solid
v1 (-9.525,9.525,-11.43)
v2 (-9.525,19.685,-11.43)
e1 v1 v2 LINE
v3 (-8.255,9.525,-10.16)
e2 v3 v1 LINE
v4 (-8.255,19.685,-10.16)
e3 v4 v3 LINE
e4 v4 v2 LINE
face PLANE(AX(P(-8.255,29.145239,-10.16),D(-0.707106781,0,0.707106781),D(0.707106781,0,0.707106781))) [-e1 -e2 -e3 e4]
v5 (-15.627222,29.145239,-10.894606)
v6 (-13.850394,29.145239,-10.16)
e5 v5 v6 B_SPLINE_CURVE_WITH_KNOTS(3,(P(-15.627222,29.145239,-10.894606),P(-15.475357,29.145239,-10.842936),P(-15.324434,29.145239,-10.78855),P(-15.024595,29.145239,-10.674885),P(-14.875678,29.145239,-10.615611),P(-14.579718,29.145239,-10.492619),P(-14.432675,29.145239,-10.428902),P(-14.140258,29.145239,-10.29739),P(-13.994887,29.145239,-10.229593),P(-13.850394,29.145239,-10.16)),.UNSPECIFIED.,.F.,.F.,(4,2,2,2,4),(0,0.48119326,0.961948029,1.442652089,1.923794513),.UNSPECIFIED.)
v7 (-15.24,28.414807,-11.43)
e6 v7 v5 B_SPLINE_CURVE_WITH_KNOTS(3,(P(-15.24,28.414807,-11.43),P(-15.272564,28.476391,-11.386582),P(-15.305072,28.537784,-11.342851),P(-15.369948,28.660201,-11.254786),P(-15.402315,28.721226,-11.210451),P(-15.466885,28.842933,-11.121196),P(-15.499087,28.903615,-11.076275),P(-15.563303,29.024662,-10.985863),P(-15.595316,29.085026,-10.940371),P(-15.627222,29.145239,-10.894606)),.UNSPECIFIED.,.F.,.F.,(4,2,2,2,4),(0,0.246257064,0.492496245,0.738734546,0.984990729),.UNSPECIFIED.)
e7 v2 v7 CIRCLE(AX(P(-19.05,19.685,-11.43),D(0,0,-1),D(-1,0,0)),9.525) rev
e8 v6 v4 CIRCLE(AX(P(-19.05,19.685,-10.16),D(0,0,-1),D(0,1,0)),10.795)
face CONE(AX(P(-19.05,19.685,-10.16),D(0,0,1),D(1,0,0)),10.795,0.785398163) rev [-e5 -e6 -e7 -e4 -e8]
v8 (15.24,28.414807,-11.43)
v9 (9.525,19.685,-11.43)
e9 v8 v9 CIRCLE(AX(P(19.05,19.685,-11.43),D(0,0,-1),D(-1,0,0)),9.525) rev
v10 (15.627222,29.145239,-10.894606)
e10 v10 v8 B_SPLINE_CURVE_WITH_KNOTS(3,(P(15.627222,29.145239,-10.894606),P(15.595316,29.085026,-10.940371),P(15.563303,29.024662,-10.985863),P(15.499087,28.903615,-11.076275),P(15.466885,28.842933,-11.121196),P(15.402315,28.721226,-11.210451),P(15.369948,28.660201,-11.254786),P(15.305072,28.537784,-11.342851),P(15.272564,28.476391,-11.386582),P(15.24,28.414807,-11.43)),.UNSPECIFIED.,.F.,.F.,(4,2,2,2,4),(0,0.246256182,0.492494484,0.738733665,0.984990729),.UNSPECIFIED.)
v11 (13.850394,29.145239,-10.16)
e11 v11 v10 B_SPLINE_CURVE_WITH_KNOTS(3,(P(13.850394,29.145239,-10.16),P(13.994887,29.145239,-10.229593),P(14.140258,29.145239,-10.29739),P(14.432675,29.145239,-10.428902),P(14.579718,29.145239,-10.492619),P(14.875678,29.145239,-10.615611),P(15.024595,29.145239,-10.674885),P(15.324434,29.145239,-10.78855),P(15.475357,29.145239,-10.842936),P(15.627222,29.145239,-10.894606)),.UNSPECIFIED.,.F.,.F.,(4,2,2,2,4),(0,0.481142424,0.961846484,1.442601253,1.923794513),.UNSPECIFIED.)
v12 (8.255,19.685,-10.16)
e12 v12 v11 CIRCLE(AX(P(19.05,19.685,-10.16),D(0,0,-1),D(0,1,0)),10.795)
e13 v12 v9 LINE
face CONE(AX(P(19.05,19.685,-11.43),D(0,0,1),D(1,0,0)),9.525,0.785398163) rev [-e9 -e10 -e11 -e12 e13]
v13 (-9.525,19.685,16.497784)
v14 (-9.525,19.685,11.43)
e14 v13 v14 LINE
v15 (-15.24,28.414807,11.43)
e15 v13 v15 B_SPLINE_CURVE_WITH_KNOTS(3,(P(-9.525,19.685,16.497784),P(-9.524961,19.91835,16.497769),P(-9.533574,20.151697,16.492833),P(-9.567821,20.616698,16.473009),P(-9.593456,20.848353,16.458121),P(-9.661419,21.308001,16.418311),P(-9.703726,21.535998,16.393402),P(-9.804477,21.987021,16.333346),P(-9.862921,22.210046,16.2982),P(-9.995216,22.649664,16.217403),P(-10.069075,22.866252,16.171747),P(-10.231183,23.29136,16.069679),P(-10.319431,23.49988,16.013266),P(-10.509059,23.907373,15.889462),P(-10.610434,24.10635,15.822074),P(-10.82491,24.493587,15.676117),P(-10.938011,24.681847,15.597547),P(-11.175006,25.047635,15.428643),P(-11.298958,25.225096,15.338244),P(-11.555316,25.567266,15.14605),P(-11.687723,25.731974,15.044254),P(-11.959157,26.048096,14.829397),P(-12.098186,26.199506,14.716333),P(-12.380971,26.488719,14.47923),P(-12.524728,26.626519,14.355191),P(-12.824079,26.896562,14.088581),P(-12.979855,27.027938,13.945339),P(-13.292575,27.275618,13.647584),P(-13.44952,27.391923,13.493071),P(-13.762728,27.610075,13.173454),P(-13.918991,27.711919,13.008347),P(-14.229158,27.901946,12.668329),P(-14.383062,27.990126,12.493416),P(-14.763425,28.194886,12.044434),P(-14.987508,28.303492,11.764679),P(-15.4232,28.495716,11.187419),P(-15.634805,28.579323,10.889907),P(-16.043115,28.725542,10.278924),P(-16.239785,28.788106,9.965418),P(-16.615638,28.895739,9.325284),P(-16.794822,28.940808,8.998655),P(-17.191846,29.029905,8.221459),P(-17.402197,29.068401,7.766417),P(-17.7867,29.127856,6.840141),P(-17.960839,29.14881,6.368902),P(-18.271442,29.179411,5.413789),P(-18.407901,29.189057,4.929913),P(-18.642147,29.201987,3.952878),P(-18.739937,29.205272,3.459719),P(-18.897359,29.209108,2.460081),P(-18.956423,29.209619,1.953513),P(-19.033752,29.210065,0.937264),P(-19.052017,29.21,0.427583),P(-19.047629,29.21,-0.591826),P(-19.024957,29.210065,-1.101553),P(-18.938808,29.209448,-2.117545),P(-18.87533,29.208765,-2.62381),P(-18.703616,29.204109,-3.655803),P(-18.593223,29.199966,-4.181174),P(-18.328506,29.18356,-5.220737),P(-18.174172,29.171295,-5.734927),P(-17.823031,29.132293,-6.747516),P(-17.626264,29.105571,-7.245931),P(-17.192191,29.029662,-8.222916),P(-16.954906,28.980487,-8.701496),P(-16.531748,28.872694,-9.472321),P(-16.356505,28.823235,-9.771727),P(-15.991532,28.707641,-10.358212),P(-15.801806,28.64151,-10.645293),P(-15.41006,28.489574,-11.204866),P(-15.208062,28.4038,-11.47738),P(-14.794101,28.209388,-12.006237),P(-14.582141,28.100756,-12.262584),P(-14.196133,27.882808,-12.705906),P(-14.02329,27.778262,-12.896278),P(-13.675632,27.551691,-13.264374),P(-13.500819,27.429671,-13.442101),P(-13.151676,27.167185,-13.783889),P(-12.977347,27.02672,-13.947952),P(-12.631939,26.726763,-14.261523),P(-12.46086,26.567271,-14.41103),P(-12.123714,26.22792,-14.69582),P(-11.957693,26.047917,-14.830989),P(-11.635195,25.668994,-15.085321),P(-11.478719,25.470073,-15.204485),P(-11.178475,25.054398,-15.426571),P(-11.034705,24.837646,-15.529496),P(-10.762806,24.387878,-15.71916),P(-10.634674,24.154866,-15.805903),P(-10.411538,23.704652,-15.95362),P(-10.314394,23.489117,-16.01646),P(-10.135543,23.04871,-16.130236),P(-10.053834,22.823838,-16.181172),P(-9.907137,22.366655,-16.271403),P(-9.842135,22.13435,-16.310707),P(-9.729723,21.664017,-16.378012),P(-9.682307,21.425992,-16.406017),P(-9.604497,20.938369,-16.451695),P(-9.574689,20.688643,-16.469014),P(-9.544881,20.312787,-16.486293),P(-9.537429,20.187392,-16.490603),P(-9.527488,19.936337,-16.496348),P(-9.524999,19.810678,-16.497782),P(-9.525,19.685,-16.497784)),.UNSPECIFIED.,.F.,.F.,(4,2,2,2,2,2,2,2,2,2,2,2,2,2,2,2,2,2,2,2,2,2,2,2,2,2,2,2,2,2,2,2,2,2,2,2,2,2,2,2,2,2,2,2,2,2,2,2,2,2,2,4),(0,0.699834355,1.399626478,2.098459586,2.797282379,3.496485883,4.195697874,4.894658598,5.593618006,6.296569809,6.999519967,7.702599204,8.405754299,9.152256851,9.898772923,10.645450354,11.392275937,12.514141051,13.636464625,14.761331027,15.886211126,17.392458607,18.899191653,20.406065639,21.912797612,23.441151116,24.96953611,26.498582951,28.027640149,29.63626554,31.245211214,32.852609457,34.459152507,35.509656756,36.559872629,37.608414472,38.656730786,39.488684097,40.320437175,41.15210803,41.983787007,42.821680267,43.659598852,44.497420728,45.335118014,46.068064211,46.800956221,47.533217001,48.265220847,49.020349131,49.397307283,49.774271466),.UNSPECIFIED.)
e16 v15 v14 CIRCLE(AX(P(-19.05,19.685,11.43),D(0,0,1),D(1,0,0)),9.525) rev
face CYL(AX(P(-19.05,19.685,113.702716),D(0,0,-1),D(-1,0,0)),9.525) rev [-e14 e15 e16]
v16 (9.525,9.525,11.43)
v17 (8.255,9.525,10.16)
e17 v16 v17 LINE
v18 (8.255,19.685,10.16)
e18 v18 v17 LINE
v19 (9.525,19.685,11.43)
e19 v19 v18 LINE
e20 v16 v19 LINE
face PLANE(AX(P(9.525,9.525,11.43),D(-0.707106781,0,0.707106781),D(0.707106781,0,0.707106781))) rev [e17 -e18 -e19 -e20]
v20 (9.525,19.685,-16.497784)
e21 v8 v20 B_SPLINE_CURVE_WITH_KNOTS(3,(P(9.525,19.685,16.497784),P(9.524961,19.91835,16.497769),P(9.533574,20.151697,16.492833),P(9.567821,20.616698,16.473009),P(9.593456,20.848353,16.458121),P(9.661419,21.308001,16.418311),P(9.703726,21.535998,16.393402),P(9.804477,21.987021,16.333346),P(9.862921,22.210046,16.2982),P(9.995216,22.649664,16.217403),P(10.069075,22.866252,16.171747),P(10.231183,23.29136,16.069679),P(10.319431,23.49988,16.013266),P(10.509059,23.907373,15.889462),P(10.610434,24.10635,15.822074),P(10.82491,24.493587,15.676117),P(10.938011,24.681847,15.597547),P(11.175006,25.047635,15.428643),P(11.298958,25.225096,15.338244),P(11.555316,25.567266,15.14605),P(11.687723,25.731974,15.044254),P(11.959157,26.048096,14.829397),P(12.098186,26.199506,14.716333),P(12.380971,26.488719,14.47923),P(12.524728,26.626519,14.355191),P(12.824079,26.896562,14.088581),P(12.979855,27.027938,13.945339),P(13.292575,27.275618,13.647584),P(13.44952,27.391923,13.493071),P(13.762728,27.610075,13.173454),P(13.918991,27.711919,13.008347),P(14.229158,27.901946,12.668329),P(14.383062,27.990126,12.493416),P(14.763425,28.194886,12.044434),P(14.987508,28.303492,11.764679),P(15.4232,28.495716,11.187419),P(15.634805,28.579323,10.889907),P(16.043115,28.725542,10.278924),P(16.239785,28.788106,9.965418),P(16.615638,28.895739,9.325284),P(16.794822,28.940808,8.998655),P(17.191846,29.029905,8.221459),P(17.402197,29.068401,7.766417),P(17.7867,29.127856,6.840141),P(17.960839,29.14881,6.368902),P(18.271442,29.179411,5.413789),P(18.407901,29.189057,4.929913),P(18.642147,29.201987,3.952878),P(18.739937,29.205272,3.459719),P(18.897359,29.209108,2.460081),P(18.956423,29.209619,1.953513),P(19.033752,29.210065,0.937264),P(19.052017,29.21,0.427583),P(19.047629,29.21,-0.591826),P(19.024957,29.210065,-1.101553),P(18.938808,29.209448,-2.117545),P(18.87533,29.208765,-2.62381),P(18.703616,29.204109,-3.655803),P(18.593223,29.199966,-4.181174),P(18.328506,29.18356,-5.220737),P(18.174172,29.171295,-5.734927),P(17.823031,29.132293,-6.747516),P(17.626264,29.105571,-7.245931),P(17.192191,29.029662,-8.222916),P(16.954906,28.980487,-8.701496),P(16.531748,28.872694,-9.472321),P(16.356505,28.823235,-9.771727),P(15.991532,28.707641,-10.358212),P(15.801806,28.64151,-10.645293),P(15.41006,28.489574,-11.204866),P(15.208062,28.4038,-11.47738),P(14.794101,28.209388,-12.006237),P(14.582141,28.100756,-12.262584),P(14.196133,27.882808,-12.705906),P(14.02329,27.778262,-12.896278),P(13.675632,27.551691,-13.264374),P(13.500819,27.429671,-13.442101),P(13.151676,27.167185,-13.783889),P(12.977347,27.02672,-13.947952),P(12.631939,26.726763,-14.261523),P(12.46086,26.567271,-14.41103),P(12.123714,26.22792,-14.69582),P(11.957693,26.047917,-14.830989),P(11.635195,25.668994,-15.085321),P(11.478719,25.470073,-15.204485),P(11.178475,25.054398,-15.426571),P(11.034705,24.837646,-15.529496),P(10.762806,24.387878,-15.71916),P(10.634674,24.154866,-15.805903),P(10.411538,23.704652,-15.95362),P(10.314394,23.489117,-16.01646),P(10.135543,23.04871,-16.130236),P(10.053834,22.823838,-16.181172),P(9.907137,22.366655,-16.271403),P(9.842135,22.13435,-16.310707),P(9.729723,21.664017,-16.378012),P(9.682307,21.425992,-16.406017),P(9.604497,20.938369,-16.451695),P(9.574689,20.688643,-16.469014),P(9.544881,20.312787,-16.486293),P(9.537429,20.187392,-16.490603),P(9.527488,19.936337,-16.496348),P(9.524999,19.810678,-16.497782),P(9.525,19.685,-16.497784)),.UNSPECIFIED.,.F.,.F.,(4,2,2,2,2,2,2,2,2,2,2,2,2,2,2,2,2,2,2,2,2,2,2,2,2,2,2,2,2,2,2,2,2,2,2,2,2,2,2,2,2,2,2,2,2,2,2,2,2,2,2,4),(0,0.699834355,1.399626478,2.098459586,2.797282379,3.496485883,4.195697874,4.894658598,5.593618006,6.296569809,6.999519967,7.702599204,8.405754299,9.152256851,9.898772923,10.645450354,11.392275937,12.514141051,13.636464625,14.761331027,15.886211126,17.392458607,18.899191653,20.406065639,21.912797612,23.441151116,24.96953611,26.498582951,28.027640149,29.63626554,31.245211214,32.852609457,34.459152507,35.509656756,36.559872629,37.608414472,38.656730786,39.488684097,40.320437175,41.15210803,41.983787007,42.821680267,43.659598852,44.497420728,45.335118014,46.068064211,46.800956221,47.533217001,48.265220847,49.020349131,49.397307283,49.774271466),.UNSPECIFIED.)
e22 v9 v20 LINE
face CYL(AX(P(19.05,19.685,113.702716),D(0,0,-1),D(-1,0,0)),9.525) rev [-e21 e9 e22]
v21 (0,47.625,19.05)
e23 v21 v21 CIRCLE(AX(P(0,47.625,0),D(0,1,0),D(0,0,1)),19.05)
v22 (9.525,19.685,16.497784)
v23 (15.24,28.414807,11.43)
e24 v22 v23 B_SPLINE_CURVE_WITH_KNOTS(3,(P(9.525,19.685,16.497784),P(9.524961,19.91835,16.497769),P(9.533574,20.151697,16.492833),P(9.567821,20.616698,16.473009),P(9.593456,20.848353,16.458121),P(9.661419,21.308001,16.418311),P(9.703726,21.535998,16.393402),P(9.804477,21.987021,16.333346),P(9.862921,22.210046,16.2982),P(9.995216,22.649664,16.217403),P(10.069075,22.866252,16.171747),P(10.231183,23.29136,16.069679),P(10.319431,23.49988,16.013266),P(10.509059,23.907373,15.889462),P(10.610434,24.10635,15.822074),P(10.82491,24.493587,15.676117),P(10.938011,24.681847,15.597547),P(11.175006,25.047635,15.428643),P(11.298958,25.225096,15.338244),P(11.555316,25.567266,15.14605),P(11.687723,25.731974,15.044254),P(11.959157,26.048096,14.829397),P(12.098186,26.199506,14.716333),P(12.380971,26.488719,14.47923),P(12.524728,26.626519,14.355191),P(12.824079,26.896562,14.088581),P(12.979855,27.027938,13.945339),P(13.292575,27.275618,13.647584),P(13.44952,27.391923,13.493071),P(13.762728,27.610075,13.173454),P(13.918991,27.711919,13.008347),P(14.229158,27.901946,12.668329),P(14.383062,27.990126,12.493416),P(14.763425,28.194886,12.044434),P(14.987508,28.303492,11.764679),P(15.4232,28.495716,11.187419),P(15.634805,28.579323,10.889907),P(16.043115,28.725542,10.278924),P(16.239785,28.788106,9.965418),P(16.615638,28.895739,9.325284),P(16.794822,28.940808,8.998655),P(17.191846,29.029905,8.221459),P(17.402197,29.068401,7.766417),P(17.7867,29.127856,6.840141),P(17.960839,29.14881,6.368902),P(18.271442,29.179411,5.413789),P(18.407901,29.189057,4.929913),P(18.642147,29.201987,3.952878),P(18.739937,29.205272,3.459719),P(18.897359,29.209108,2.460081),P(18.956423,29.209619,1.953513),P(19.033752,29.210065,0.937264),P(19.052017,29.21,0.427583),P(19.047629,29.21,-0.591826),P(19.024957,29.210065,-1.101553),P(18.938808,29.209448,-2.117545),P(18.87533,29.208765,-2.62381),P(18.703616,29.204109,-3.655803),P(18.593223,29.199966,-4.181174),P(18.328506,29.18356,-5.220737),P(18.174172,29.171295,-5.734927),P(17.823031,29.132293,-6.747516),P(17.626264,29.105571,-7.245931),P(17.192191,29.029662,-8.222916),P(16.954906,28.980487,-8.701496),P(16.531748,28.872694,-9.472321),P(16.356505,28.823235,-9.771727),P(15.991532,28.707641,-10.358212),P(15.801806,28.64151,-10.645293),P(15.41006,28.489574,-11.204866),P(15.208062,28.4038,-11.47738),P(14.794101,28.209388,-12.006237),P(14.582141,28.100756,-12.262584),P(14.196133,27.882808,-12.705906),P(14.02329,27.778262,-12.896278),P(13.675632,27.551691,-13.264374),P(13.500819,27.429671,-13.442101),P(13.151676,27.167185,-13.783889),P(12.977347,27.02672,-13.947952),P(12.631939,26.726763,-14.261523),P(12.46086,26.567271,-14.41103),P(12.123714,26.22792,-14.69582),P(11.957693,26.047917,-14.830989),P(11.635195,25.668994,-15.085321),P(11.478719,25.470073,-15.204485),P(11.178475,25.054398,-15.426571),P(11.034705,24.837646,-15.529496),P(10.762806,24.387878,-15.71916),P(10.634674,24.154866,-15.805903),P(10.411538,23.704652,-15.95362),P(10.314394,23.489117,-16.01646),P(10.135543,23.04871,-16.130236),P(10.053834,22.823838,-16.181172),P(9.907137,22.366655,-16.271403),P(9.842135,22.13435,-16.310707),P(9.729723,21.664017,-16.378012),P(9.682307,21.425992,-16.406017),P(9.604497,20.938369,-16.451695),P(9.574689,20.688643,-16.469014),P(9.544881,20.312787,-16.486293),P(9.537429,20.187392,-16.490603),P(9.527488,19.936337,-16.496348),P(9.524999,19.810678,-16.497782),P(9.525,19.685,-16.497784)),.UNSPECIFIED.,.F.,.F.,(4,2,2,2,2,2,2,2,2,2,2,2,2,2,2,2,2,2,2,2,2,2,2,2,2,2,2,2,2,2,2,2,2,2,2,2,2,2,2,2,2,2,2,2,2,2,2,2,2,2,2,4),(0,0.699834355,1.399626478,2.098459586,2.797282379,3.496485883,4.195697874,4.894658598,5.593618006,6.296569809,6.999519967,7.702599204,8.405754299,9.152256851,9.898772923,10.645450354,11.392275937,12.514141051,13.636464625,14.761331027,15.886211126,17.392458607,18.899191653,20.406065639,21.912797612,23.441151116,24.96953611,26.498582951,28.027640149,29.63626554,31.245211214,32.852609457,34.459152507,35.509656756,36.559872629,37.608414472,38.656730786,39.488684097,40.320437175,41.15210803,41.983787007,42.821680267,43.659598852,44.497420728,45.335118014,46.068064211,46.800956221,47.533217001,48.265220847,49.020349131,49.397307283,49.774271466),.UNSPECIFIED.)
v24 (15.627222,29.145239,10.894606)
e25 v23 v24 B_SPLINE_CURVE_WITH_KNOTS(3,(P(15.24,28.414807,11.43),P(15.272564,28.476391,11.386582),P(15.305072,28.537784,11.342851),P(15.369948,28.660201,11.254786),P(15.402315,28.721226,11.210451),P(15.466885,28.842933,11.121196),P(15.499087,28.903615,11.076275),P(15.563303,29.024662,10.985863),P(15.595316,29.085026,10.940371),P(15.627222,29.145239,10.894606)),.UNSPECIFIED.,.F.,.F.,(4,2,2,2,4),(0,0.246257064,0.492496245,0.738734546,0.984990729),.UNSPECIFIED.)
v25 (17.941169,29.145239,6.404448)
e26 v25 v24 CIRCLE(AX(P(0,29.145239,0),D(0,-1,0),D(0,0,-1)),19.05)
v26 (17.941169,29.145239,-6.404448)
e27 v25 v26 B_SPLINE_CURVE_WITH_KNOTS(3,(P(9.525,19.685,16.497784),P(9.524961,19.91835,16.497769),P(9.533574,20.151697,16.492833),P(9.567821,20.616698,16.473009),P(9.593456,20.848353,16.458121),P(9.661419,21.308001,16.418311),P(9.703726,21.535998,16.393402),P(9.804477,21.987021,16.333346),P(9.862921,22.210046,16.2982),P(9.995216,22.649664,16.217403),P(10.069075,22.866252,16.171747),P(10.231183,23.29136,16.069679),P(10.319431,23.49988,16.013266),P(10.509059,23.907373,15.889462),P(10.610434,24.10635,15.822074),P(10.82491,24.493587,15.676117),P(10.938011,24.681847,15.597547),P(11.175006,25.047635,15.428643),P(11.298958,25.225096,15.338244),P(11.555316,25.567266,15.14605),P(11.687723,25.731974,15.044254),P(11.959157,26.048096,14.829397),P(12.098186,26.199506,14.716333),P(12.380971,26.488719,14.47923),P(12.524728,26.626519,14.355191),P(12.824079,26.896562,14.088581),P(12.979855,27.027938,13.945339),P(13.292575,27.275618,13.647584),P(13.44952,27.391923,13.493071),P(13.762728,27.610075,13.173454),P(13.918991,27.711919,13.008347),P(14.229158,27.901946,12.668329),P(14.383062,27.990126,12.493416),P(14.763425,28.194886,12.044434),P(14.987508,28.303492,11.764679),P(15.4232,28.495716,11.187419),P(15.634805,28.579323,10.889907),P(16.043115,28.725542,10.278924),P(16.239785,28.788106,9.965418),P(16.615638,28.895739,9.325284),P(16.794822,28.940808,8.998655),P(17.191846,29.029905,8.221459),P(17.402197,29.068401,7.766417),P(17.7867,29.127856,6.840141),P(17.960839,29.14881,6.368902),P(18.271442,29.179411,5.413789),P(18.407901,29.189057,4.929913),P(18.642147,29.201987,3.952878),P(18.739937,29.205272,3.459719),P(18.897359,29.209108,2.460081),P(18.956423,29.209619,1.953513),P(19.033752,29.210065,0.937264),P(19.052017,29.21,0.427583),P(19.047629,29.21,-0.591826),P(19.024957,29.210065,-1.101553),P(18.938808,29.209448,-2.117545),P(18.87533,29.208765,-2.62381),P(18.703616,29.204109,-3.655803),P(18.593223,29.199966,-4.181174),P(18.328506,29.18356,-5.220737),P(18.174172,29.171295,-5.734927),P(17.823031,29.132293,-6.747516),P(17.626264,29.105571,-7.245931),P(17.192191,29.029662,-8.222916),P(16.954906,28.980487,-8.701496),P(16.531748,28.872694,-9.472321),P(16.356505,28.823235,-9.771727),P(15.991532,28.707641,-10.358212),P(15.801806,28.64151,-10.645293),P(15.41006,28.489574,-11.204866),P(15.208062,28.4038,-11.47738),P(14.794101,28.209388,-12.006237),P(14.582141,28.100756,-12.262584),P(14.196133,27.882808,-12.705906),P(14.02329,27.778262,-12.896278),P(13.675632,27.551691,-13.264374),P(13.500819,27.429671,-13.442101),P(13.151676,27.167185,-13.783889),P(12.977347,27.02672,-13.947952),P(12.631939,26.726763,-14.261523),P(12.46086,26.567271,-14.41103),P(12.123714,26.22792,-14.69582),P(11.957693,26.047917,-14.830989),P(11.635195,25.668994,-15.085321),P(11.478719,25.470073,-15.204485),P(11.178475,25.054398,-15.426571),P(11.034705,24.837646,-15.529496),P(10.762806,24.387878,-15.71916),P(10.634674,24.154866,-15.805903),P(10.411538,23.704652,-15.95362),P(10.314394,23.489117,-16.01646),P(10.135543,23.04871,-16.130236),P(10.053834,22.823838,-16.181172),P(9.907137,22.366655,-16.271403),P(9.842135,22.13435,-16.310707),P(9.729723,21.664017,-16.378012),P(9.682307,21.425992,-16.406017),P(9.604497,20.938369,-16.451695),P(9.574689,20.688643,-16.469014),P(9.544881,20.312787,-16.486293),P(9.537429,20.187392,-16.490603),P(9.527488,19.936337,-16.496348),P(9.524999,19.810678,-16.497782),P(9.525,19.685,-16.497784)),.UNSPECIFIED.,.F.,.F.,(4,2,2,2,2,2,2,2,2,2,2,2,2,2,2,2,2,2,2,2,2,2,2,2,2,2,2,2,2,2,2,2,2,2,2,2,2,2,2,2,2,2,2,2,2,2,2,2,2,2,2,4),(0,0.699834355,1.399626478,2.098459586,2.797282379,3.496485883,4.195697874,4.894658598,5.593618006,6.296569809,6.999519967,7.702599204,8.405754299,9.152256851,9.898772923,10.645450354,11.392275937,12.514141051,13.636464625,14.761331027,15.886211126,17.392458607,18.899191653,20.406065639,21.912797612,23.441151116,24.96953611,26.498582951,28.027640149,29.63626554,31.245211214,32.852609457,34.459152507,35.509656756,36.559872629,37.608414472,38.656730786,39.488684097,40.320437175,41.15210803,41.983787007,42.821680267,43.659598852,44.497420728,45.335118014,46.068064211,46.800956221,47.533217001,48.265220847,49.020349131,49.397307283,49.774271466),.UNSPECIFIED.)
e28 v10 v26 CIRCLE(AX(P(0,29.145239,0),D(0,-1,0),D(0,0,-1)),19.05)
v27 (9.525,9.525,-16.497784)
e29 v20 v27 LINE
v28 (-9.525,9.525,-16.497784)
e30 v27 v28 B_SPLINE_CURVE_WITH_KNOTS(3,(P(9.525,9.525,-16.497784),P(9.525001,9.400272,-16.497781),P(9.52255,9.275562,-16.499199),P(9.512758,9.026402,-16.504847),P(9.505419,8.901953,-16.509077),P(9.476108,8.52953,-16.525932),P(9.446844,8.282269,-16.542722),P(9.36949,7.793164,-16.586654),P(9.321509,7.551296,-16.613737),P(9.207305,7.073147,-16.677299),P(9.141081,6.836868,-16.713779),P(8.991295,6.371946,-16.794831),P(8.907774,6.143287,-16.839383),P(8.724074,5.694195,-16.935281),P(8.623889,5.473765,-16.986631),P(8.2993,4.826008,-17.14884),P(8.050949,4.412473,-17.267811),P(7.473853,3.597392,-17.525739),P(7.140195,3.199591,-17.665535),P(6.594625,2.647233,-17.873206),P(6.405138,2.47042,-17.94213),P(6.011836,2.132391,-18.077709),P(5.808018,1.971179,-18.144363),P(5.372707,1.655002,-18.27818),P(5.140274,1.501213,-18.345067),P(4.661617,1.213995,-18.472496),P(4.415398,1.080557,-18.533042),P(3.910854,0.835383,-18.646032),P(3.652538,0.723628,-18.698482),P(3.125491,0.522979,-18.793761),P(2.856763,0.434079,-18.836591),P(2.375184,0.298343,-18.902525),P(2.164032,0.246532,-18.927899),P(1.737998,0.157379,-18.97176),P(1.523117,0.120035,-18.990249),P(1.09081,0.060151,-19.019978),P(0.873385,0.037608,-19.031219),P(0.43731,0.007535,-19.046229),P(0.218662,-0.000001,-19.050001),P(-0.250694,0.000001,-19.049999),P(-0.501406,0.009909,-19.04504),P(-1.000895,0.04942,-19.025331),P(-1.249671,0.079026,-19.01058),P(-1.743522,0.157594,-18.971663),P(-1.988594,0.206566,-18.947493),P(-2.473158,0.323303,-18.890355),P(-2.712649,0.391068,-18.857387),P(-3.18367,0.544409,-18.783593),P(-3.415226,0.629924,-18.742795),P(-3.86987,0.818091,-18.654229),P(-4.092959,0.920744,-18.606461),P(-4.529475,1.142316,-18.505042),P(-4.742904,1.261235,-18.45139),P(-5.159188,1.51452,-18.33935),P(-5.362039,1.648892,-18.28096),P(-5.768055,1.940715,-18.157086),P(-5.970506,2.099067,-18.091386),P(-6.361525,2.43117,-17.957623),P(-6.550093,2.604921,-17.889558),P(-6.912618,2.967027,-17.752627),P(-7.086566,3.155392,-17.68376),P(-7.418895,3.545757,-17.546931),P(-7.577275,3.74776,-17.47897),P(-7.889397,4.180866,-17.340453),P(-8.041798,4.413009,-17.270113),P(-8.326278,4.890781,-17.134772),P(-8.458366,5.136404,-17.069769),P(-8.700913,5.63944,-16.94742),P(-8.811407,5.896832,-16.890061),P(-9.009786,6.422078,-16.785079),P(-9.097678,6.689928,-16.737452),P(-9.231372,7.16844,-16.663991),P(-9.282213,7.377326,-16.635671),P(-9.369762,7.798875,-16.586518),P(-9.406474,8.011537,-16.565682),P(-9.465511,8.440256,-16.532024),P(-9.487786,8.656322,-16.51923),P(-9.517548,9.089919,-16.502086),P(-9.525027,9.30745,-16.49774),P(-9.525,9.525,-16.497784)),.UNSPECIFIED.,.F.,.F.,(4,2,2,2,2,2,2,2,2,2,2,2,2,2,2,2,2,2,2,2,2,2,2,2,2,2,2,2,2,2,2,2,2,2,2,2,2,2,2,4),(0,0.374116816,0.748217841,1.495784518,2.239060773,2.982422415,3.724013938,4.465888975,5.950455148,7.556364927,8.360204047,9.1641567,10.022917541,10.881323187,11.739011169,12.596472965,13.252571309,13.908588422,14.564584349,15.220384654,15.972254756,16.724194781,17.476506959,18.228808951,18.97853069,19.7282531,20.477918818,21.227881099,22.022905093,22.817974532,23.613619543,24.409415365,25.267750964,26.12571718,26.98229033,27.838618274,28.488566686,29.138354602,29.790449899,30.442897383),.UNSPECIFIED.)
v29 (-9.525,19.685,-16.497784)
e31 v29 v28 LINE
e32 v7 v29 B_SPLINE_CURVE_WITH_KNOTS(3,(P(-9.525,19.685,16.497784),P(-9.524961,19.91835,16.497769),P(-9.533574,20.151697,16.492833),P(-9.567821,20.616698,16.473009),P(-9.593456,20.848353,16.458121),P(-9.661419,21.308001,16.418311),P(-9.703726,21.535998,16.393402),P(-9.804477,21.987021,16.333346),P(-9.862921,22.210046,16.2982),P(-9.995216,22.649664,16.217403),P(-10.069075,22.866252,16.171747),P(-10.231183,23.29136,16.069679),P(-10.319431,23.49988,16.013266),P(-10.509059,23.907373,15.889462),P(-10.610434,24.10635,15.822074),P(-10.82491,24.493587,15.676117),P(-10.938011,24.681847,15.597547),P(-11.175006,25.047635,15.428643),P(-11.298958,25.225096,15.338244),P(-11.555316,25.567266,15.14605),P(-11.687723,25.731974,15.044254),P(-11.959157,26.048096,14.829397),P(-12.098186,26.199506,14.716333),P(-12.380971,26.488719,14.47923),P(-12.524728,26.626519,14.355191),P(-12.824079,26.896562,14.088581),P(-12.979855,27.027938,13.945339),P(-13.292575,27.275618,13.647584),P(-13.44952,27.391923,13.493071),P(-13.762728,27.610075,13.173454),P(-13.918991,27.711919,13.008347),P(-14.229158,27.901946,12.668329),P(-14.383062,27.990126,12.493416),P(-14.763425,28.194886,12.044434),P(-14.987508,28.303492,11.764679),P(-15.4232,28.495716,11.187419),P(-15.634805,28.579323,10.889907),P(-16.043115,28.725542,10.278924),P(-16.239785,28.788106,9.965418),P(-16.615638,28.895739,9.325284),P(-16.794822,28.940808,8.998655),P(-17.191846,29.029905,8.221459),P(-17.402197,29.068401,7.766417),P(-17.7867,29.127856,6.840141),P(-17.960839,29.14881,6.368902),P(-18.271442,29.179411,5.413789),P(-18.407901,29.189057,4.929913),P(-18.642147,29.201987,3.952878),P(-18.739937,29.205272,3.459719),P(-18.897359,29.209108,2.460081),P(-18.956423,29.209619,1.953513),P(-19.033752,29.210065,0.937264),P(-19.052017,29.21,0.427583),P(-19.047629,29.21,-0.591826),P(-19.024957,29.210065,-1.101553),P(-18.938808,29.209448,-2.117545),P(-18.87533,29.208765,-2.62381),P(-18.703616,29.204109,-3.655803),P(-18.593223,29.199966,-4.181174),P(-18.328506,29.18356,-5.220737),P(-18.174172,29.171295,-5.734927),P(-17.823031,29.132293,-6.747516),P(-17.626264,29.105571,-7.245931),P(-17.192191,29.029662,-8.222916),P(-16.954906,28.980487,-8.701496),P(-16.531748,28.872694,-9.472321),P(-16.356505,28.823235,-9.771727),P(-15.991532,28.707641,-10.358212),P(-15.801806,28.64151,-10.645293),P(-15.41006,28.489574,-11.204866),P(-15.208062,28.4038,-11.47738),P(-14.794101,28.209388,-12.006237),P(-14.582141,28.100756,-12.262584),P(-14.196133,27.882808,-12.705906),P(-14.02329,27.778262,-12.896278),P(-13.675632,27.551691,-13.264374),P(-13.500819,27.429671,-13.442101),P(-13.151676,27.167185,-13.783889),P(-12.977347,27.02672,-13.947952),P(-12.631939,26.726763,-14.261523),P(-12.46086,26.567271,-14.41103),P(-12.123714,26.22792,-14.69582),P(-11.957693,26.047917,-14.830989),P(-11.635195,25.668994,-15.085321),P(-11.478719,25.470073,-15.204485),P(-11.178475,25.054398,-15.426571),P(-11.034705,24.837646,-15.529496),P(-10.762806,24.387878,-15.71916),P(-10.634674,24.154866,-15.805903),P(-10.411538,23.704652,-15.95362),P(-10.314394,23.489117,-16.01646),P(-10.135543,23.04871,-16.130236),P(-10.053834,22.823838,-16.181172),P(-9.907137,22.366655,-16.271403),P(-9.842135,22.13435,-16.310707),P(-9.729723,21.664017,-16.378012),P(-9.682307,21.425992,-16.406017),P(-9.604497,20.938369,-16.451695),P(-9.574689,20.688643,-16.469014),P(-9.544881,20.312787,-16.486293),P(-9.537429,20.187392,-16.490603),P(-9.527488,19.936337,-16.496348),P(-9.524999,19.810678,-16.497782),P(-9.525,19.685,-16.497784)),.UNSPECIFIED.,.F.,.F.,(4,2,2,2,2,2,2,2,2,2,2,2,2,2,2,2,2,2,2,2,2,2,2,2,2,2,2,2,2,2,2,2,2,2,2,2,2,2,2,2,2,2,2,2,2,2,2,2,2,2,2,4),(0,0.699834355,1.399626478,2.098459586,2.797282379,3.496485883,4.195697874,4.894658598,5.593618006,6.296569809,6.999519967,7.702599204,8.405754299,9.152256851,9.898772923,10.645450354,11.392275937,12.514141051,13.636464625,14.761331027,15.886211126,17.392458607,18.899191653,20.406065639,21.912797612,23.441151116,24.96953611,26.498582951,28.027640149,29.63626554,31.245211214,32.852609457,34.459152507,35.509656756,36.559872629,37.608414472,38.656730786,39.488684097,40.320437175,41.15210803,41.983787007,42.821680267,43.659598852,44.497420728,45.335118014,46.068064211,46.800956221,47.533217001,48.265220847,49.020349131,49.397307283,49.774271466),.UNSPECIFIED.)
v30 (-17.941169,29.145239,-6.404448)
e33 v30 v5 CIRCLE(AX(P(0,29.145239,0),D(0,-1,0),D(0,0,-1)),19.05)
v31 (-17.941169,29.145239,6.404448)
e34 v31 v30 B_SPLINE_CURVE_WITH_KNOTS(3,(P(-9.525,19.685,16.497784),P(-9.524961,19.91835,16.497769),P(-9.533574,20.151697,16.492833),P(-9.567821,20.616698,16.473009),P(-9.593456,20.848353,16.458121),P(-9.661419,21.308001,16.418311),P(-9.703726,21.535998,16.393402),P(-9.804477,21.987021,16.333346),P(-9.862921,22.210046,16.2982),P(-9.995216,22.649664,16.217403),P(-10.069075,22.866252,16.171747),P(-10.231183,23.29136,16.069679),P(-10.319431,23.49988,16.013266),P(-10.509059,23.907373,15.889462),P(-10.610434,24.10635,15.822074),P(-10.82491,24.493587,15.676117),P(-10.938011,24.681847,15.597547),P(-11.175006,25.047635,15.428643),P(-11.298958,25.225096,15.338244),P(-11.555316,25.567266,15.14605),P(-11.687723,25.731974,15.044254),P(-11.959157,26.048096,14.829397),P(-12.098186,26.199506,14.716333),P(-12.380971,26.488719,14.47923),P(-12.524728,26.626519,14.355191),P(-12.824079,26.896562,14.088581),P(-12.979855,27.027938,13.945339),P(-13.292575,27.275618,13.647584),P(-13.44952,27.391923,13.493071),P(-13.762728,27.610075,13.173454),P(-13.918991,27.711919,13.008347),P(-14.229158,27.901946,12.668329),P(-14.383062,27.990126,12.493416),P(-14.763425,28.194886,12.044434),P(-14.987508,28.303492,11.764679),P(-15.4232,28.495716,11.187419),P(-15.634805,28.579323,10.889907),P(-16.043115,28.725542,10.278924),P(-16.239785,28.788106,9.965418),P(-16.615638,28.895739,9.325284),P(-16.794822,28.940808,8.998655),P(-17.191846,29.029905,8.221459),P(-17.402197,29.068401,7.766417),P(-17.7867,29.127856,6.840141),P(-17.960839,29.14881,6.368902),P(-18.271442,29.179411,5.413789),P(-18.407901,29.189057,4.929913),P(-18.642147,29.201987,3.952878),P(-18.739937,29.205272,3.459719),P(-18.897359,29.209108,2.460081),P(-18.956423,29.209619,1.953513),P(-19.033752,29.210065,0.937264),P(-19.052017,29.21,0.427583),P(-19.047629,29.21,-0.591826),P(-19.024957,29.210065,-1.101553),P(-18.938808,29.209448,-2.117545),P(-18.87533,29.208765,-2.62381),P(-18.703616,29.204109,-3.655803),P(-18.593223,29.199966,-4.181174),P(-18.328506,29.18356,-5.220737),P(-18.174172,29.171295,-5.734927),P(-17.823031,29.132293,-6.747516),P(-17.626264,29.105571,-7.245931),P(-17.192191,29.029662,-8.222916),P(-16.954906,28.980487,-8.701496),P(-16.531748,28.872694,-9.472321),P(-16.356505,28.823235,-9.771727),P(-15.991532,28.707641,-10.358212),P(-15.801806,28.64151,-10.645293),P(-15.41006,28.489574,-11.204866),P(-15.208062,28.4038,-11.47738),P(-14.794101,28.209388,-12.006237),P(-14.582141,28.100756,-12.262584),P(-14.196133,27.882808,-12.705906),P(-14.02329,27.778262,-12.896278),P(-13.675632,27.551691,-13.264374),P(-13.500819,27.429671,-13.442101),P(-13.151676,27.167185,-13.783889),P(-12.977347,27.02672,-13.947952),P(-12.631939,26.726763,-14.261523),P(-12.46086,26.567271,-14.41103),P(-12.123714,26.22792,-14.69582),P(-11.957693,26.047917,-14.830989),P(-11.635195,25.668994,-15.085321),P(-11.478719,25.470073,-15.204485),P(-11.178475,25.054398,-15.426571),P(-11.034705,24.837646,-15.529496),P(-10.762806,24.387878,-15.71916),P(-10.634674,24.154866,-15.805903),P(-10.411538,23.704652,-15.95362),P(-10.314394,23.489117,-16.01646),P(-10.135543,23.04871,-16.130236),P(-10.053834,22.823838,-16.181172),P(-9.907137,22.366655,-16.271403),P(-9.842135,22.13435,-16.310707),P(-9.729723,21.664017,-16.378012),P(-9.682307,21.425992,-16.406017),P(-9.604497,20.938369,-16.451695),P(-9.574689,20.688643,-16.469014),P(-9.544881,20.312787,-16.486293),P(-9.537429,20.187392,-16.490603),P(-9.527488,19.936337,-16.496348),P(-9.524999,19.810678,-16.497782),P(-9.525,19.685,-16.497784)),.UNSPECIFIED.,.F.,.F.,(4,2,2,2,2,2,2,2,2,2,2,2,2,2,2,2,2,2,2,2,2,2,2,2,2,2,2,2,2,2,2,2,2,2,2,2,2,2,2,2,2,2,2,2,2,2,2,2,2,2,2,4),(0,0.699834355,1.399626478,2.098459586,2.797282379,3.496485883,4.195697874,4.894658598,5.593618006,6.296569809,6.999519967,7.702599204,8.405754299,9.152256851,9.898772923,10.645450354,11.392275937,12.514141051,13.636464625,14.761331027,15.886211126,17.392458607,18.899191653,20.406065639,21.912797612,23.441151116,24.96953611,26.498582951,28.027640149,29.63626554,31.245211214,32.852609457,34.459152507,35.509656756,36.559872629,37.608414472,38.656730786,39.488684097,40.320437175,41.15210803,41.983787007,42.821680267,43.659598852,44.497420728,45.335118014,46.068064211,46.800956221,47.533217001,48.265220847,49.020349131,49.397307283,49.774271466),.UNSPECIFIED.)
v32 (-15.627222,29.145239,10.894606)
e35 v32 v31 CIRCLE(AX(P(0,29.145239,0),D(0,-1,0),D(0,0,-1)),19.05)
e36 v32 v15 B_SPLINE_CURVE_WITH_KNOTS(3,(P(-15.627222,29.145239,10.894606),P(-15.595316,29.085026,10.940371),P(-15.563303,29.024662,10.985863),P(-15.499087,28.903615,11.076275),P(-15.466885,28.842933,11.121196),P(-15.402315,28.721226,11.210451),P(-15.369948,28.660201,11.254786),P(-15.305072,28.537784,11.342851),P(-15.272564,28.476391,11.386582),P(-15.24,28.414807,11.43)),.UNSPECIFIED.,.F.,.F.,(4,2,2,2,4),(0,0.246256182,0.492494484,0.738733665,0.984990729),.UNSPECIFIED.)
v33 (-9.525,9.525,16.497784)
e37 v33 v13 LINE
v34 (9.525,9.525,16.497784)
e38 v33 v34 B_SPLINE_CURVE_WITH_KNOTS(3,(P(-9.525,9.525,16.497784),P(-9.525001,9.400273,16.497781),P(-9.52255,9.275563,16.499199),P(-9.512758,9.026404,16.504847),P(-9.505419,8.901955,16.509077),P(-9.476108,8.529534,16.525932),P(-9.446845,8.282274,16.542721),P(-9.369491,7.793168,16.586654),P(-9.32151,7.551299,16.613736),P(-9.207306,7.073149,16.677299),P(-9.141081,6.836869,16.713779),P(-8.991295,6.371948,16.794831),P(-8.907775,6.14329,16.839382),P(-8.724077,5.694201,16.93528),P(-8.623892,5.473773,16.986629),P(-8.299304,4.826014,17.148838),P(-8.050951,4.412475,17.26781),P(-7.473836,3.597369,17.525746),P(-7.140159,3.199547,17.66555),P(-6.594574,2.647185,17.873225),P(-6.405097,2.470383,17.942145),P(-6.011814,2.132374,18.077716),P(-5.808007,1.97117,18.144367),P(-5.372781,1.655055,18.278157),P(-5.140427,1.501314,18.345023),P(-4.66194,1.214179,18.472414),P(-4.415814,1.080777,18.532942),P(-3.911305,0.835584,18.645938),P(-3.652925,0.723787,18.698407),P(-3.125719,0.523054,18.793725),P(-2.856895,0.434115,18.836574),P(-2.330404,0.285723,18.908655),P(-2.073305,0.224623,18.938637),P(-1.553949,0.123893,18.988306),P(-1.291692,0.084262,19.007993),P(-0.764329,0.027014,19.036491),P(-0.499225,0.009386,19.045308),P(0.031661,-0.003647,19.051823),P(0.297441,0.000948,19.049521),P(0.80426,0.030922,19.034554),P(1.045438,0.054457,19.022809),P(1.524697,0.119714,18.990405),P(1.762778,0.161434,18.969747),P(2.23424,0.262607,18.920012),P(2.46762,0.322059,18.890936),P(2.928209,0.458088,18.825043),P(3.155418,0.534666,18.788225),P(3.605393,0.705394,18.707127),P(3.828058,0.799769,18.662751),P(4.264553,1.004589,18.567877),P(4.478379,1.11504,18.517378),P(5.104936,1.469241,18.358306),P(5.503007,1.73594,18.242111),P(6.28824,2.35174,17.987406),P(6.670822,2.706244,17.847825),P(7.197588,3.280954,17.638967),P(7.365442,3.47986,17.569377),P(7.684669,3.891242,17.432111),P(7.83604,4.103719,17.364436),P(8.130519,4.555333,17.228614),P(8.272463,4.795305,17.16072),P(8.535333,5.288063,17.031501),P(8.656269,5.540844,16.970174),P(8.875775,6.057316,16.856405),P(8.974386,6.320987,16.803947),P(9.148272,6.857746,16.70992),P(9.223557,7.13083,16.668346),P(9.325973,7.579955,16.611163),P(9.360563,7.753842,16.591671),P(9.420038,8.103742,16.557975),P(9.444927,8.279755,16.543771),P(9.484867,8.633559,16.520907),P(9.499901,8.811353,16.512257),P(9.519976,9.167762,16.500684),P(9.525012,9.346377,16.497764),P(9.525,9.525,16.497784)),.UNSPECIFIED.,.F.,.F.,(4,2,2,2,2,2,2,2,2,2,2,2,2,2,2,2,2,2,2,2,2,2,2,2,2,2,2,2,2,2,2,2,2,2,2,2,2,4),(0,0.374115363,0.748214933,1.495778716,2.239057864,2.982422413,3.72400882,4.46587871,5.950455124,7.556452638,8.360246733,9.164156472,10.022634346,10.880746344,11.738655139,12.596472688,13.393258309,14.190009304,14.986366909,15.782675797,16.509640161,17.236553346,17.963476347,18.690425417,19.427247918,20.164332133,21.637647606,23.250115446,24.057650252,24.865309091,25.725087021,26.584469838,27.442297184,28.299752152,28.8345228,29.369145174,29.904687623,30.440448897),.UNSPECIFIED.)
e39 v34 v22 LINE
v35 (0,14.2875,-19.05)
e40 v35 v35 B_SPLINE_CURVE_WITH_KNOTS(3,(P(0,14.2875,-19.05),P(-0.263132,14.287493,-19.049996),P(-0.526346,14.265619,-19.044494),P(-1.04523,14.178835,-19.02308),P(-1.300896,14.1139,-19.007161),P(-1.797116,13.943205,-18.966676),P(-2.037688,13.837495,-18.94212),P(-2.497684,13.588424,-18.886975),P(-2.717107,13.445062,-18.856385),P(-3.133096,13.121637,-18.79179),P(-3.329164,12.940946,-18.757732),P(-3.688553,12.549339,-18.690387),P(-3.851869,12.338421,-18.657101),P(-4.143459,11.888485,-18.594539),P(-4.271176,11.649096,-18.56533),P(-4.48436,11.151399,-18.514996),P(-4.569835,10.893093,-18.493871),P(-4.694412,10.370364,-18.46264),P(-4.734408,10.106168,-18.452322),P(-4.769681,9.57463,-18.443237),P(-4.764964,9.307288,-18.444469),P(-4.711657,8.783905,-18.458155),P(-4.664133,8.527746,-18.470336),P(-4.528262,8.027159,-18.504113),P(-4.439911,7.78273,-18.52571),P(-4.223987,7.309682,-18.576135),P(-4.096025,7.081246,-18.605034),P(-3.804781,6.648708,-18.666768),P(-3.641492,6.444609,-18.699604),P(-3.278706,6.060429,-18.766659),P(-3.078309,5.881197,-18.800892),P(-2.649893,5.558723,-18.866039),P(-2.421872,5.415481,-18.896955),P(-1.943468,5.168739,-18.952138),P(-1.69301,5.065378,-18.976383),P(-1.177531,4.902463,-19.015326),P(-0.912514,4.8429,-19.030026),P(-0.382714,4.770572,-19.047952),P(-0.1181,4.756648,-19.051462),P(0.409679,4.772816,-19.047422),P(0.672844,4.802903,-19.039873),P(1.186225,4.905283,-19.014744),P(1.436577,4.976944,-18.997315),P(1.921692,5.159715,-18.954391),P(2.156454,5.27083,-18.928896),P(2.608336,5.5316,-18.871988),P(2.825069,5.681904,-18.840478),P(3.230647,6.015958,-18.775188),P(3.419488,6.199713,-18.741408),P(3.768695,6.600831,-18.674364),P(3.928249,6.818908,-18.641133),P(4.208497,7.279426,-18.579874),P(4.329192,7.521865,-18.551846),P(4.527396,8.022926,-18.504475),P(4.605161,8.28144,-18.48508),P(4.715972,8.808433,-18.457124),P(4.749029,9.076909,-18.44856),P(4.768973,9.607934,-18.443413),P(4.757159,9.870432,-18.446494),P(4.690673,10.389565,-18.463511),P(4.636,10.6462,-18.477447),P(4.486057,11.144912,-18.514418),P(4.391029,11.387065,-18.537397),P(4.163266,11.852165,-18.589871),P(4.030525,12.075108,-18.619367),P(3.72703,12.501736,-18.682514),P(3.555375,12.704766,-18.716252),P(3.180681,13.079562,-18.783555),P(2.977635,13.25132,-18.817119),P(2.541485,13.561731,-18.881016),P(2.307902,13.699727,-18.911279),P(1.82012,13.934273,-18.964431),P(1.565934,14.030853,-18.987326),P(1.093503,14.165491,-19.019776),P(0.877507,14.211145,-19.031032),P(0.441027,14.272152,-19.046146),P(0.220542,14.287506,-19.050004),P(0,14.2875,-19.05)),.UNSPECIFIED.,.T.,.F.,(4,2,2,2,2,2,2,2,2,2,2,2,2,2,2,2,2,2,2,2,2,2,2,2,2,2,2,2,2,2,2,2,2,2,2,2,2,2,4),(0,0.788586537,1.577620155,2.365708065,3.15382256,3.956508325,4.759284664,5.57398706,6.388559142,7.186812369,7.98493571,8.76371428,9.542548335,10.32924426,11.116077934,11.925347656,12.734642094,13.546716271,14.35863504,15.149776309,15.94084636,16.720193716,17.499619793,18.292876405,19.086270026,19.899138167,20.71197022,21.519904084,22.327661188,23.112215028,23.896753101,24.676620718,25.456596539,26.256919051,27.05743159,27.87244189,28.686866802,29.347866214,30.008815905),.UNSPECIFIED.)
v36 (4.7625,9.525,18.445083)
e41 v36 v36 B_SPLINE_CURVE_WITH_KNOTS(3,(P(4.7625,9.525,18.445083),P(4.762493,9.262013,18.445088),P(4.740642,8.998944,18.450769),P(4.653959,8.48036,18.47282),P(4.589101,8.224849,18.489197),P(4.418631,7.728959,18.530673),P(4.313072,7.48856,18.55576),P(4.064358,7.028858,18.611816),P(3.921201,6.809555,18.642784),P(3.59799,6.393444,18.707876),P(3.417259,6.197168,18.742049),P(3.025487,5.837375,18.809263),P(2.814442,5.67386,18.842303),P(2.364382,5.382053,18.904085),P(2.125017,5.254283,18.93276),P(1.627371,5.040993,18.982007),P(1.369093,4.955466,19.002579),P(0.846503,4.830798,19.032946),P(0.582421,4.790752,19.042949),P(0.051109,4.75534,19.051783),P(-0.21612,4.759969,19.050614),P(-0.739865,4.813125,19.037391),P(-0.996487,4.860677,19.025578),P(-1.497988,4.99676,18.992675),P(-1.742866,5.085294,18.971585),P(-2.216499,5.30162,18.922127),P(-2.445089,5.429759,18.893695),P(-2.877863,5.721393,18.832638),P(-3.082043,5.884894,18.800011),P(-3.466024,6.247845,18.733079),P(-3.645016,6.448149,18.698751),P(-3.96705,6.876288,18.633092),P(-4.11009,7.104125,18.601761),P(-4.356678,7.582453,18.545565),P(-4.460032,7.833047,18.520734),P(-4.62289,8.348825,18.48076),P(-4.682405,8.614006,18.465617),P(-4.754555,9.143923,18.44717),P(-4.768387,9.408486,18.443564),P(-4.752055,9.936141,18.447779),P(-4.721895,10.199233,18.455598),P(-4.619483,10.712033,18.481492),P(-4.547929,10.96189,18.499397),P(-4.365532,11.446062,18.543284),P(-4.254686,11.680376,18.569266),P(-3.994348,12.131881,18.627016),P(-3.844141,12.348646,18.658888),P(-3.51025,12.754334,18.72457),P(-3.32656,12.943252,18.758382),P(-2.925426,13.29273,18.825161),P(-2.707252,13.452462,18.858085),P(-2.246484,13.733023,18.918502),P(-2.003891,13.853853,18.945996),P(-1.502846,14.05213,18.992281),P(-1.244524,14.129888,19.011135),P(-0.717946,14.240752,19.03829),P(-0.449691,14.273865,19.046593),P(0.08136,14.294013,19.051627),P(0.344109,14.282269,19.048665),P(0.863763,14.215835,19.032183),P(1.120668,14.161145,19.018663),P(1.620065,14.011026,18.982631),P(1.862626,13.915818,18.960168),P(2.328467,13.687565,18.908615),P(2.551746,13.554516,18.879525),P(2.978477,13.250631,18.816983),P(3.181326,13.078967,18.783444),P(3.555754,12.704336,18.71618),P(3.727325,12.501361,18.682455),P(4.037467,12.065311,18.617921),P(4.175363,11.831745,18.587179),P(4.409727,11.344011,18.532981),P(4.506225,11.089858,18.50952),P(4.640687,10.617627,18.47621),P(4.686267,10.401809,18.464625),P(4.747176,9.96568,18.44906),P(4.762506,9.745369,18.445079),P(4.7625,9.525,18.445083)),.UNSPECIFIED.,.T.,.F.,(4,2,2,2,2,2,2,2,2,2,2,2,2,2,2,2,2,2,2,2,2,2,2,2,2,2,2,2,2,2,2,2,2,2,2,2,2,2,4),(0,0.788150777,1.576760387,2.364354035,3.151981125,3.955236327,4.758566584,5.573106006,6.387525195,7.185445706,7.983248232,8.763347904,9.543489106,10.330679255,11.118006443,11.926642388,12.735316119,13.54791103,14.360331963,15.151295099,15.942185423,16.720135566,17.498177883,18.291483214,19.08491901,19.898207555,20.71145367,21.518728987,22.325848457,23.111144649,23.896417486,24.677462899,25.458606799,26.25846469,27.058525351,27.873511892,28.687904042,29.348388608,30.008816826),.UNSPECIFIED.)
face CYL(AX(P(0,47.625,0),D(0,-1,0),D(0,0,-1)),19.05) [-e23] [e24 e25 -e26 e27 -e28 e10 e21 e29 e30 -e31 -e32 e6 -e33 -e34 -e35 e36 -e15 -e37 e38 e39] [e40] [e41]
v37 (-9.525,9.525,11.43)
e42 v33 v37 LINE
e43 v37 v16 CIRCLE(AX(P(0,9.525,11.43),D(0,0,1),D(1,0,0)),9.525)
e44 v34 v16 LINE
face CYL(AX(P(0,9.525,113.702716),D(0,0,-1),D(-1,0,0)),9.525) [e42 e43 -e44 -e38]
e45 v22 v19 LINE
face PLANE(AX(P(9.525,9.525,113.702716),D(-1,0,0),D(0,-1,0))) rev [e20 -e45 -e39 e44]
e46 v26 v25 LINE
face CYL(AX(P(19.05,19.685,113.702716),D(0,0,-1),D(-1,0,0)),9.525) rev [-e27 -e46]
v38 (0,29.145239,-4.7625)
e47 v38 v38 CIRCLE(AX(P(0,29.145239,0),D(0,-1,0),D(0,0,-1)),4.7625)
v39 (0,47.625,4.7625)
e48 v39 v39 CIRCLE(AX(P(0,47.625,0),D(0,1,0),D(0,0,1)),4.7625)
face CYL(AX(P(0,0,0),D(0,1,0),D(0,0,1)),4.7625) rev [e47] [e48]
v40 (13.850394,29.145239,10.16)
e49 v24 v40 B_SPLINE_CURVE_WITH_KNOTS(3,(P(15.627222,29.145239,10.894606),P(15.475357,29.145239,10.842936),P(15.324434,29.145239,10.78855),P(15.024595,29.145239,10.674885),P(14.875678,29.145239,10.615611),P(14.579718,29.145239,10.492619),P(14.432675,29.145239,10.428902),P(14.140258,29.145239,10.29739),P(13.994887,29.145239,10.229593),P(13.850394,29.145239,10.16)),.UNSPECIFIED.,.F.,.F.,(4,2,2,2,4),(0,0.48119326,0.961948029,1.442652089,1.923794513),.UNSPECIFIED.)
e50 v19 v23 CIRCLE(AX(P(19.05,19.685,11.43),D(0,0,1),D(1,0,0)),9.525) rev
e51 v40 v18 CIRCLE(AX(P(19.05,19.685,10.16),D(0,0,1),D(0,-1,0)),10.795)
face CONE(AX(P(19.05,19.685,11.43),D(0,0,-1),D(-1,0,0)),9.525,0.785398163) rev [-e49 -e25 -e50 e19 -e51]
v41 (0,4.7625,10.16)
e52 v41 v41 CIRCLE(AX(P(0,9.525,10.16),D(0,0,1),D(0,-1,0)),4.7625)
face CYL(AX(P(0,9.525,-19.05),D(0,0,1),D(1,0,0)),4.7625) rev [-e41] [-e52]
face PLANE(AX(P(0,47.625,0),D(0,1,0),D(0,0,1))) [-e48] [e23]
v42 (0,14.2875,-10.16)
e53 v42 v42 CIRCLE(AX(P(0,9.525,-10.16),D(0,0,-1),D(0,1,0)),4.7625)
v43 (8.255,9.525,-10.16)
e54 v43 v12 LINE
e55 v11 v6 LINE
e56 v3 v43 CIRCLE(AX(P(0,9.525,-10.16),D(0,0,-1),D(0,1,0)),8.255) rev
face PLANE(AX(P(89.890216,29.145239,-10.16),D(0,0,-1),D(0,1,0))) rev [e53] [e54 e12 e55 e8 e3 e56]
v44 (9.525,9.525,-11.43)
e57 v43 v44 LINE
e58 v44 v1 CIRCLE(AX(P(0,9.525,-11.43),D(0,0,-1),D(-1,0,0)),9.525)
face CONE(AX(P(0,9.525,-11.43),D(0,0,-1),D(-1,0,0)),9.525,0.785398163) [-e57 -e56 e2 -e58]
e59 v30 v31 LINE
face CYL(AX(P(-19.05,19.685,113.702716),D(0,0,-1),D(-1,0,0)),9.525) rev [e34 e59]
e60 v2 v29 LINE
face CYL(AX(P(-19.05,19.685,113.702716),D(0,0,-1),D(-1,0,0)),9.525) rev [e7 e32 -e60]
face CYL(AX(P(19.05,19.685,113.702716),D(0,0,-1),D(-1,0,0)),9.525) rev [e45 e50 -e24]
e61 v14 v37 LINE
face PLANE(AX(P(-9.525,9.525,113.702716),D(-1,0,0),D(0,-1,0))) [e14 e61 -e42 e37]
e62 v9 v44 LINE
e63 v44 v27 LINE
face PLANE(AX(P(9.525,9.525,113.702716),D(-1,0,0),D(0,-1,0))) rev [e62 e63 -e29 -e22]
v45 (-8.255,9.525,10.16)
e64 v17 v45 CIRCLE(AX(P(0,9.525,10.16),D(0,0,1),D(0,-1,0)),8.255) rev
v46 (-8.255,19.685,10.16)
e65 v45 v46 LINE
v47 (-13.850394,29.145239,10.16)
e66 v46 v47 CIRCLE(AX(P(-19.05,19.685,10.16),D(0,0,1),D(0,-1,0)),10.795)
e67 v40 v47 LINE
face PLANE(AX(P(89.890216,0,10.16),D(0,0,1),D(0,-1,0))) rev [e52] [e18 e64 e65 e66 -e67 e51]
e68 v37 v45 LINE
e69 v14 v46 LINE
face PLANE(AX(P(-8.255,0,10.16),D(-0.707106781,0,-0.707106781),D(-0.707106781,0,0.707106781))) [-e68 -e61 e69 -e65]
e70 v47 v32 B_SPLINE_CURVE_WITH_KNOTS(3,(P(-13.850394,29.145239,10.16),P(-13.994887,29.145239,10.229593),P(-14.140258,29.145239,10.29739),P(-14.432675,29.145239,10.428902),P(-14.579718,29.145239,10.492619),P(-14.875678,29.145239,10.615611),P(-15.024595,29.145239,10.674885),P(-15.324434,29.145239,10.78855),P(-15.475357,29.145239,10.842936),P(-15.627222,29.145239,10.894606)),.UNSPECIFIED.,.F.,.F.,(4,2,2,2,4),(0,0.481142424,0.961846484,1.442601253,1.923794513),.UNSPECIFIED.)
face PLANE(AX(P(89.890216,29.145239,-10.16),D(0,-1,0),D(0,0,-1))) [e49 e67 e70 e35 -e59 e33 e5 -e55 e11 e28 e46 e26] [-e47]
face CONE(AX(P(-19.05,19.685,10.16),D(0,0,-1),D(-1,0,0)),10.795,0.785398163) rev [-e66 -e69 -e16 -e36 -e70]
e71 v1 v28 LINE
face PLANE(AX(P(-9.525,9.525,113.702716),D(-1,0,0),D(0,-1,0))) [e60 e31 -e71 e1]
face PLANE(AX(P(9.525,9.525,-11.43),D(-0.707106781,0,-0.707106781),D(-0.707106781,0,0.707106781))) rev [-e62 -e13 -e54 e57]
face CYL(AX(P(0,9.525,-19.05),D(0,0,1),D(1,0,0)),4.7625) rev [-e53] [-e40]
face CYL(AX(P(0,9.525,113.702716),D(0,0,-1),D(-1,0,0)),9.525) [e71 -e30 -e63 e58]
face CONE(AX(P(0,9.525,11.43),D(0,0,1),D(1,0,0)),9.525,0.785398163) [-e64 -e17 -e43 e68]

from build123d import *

# Parameters (mm, degrees)
SKETCH1_R               = 19.05
BASE_EXTRUDE_DEPTH      = 47.625
CUT_EXTRUDE1_DEPTH      = 55.716959208
CUT_EXTRUDE1_DEPTH_BACK = 55.716959208
CUT_EXTRUDE5_DEPTH      = 55.716959365
CUT_EXTRUDE5_DEPTH_BACK = 55.716959365
CUT_EXTRUDE6_DEPTH      = 55.716959365
CUT_EXTRUDE6_DEPTH_BACK = 55.716959365
SKETCH11_R              = 4.7625
SKETCH12_R              = 4.7625
CUT_EXTRUDE7_DEPTH      = 55.716959365
CHAMFER1_SIZE           = 1.27


with BuildPart() as part:
    # Sketch1 → Base-Extrude (new body)
    with BuildSketch(Plane(origin=(0, 0, 0), x_dir=(-1, 0, 0), z_dir=(0, 1, 0))):
        with Locations(Location((0, 0, 0), (0, 0, 90))):
            Circle(SKETCH1_R)
    extrude(amount=BASE_EXTRUDE_DEPTH)

    # Sketch2 → Cut-Extrude1 (cut, two sides: drawn at the far end of the back side and taken through both)
    with BuildSketch(Plane.XY.offset(-CUT_EXTRUDE1_DEPTH_BACK)):
        with BuildLine():
            Line((-19.05, -131.979516723), (-19.05, 0))
            Line((-19.05, 0), (-19.05, 29.21))
            ThreePointArc((-19.05, 29.21), (-12.314807909, 26.420192091), (-9.525, 19.685))
            Line((-9.525, 19.685), (-9.525, 9.525))
            ThreePointArc((-9.525, 9.525), (0, 0), (9.525, 9.525))
            Line((9.525, 9.525), (9.525, 19.685))
            ThreePointArc((9.525, 19.685), (12.314807909, 26.420192091), (19.05, 29.21))
            Line((19.05, 29.21), (19.05, 0))
            Line((19.05, 0), (19.05, -131.979516723))
            Line((19.05, -131.979516723), (19.05, -395.938550169))
            Line((19.05, -395.938550169), (-19.05, -395.938550169))
            Line((-19.05, -395.938550169), (-19.05, -131.979516723))
        make_face()
    extrude(amount=CUT_EXTRUDE1_DEPTH + CUT_EXTRUDE1_DEPTH_BACK, mode=Mode.SUBTRACT)

    # Sketch8 → Cut-Extrude5 (cut, two sides: drawn at the far end of the back side and taken through both)
    with BuildSketch(Plane(origin=(0, 0, 0), x_dir=(0, 0, -1), z_dir=(1, 0, 0)).offset(-CUT_EXTRUDE5_DEPTH_BACK)):
        Polygon((-10.16, -121.738350451), (-10.16, 0), (-10.16, 29.145238826), (10.16, 29.145238826), (10.16, 0), (10.16, -121.738350451), (10.16, -365.215051352), (-10.16, -365.215051352), align=None)
    extrude(amount=CUT_EXTRUDE5_DEPTH + CUT_EXTRUDE5_DEPTH_BACK, mode=Mode.SUBTRACT)

    # Sketch11 → Cut-Extrude6 (cut, two sides: drawn at the far end of the back side and taken through both)
    with BuildSketch(Plane.XY.offset(-CUT_EXTRUDE6_DEPTH_BACK)):
        with Locations(Location((0, 9.525, 0), (0, 0, 90))):
            Circle(SKETCH11_R)
    extrude(amount=CUT_EXTRUDE6_DEPTH + CUT_EXTRUDE6_DEPTH_BACK, mode=Mode.SUBTRACT)

    # Sketch12 → Cut-Extrude7 (cut, through all)
    with BuildSketch(Plane(origin=(0, 47.625, 0), x_dir=(-1, 0, 0), z_dir=(0, 1, 0))):
        with Locations(Location((0, 0, 0), (0, 0, 90))):
            Circle(SKETCH12_R)
    extrude(amount=-CUT_EXTRUDE7_DEPTH, mode=Mode.SUBTRACT)

    # Chamfer1
    # the kernel refuses this chamfer: 1.27 mm, written as the material it takes off along each edge
    with BuildSketch(Plane(origin=(19.05, 19.685, -10.16), x_dir=(-1, 0, 0), z_dir=(0, -1, 0))) as chamfer1_piece_1_section:
        Polygon((9.525 + CHAMFER1_SIZE, 0), (9.525, CHAMFER1_SIZE), (9.525, 0), align=None)
    chamfer1_piece_1 = revolve(axis=Axis((19.05, 19.685, -10.16), (0, 0, -1)), revolution_arc=91.701103325, mode=Mode.PRIVATE)
    chamfer1_piece_1 = split(chamfer1_piece_1, bisect_by=Plane(origin=(9.159628587, 29.145238826, -10.520330591), z_dir=(0, -1, 0)), keep=Keep.TOP, mode=Mode.PRIVATE)
    add(chamfer1_piece_1, mode=Mode.SUBTRACT)
    with BuildSketch(Plane(origin=(9.525, 19.685, -10.16), x_dir=(-0.9996219169112966, 0, 0.027495876610585942), z_dir=(0, -1, 0)), Plane(origin=(-9.525, 9.525, -10.16), x_dir=(0.9996219169112966, 0, 0.027495876610585942), z_dir=(0, 1, 0)), Plane(origin=(-9.525, 19.685, 10.16), x_dir=(0.9996219169112966, 0, -0.027495876610585942), z_dir=(0, -1, 0))) as chamfer1_piece_2:
        Polygon((CHAMFER1_SIZE * 0.999621916911, CHAMFER1_SIZE * 0.0274958766106), (-CHAMFER1_SIZE * 0.0274958766106, CHAMFER1_SIZE * 0.999621916911), (0, 0), align=None)
    extrude(amount=10.16, mode=Mode.SUBTRACT)
    with BuildSketch(Plane(origin=(0, 9.525, -10.16), x_dir=(1, 0, 0), z_dir=(0, 1, 0))) as chamfer1_piece_3:
        Polygon((9.525 - CHAMFER1_SIZE, 0), (9.525, CHAMFER1_SIZE), (9.525, 0), align=None)
    revolve(axis=Axis((0, 9.525, -10.16), (0, 0, -1)), revolution_arc=180, mode=Mode.SUBTRACT)
    with BuildSketch(Plane(origin=(-19.05, 19.685, -10.16), x_dir=(-0.029685492056236547, 0.9995592886674503, 0), z_dir=(-0.9995592886674503, -0.029685492056236547, 0))) as chamfer1_piece_4_section:
        Polygon((9.525 + CHAMFER1_SIZE, 0), (9.525, CHAMFER1_SIZE), (9.525, 0), align=None)
    chamfer1_piece_4 = revolve(axis=Axis((-19.05, 19.685, -10.16), (0, 0, -1)), revolution_arc=91.701103313, mode=Mode.PRIVATE)
    chamfer1_piece_4 = split(chamfer1_piece_4, bisect_by=Plane(origin=(-11.981482464, 29.145238826, -10.596388044), z_dir=(0, -1, 0)), keep=Keep.TOP, mode=Mode.PRIVATE)
    add(chamfer1_piece_4, mode=Mode.SUBTRACT)
    with BuildSketch(Plane(origin=(19.05, 19.685, 10.16), x_dir=(-1, 0, 0), z_dir=(0, -1, 0))) as chamfer1_piece_5_section:
        Polygon((9.525, -CHAMFER1_SIZE), (9.525 + CHAMFER1_SIZE, 0), (9.525, 0), align=None)
    chamfer1_piece_5 = revolve(axis=Axis((19.05, 19.685, 10.16), (0, 0, -1)), revolution_arc=91.701103313, mode=Mode.PRIVATE)
    chamfer1_piece_5 = split(chamfer1_piece_5, bisect_by=Plane(origin=(11.981482474, 29.145238826, 10.59638804), z_dir=(0, -1, 0)), keep=Keep.TOP, mode=Mode.PRIVATE)
    add(chamfer1_piece_5, mode=Mode.SUBTRACT)
    with BuildSketch(Plane(origin=(9.525, 9.525, 10.16), x_dir=(0.02749587661058595, 0, 0.9996219169112968), z_dir=(0, 1, 0))) as chamfer1_piece_6:
        Polygon((CHAMFER1_SIZE * 0.999621916911, -CHAMFER1_SIZE * 0.0274958766106), (-CHAMFER1_SIZE * 0.0274958766106, -CHAMFER1_SIZE * 0.999621916911), (0, 0), align=None)
    extrude(amount=10.16, mode=Mode.SUBTRACT)
    with BuildSketch(Plane(origin=(0, 9.525, 10.16), x_dir=(1, 0, 0), z_dir=(0, 1, 0))) as chamfer1_piece_7:
        Polygon((9.525, -CHAMFER1_SIZE), (9.525 - CHAMFER1_SIZE, 0), (9.525, 0), align=None)
    revolve(axis=Axis((0, 9.525, 10.16), (0, 0, -1)), revolution_arc=180, mode=Mode.SUBTRACT)
    with BuildSketch(Plane(origin=(-19.05, 19.685, 10.16), x_dir=(-0.02968549226478587, 0.9995592886612565, 0), z_dir=(-0.9995592886612565, -0.02968549226478587, 0))) as chamfer1_piece_8_section:
        Polygon((9.525 + CHAMFER1_SIZE, 0), (9.525, -CHAMFER1_SIZE), (9.525, 0), align=None)
    chamfer1_piece_8 = revolve(axis=Axis((-19.05, 19.685, 10.16), (0, 0, -1)), revolution_arc=91.701103325, mode=Mode.PRIVATE)
    chamfer1_piece_8 = split(chamfer1_piece_8, bisect_by=Plane(origin=(-11.981482467, 29.145238826, 10.596388044), z_dir=(0, -1, 0)), keep=Keep.TOP, mode=Mode.PRIVATE)
    add(chamfer1_piece_8, mode=Mode.SUBTRACT)


solid = part.part
